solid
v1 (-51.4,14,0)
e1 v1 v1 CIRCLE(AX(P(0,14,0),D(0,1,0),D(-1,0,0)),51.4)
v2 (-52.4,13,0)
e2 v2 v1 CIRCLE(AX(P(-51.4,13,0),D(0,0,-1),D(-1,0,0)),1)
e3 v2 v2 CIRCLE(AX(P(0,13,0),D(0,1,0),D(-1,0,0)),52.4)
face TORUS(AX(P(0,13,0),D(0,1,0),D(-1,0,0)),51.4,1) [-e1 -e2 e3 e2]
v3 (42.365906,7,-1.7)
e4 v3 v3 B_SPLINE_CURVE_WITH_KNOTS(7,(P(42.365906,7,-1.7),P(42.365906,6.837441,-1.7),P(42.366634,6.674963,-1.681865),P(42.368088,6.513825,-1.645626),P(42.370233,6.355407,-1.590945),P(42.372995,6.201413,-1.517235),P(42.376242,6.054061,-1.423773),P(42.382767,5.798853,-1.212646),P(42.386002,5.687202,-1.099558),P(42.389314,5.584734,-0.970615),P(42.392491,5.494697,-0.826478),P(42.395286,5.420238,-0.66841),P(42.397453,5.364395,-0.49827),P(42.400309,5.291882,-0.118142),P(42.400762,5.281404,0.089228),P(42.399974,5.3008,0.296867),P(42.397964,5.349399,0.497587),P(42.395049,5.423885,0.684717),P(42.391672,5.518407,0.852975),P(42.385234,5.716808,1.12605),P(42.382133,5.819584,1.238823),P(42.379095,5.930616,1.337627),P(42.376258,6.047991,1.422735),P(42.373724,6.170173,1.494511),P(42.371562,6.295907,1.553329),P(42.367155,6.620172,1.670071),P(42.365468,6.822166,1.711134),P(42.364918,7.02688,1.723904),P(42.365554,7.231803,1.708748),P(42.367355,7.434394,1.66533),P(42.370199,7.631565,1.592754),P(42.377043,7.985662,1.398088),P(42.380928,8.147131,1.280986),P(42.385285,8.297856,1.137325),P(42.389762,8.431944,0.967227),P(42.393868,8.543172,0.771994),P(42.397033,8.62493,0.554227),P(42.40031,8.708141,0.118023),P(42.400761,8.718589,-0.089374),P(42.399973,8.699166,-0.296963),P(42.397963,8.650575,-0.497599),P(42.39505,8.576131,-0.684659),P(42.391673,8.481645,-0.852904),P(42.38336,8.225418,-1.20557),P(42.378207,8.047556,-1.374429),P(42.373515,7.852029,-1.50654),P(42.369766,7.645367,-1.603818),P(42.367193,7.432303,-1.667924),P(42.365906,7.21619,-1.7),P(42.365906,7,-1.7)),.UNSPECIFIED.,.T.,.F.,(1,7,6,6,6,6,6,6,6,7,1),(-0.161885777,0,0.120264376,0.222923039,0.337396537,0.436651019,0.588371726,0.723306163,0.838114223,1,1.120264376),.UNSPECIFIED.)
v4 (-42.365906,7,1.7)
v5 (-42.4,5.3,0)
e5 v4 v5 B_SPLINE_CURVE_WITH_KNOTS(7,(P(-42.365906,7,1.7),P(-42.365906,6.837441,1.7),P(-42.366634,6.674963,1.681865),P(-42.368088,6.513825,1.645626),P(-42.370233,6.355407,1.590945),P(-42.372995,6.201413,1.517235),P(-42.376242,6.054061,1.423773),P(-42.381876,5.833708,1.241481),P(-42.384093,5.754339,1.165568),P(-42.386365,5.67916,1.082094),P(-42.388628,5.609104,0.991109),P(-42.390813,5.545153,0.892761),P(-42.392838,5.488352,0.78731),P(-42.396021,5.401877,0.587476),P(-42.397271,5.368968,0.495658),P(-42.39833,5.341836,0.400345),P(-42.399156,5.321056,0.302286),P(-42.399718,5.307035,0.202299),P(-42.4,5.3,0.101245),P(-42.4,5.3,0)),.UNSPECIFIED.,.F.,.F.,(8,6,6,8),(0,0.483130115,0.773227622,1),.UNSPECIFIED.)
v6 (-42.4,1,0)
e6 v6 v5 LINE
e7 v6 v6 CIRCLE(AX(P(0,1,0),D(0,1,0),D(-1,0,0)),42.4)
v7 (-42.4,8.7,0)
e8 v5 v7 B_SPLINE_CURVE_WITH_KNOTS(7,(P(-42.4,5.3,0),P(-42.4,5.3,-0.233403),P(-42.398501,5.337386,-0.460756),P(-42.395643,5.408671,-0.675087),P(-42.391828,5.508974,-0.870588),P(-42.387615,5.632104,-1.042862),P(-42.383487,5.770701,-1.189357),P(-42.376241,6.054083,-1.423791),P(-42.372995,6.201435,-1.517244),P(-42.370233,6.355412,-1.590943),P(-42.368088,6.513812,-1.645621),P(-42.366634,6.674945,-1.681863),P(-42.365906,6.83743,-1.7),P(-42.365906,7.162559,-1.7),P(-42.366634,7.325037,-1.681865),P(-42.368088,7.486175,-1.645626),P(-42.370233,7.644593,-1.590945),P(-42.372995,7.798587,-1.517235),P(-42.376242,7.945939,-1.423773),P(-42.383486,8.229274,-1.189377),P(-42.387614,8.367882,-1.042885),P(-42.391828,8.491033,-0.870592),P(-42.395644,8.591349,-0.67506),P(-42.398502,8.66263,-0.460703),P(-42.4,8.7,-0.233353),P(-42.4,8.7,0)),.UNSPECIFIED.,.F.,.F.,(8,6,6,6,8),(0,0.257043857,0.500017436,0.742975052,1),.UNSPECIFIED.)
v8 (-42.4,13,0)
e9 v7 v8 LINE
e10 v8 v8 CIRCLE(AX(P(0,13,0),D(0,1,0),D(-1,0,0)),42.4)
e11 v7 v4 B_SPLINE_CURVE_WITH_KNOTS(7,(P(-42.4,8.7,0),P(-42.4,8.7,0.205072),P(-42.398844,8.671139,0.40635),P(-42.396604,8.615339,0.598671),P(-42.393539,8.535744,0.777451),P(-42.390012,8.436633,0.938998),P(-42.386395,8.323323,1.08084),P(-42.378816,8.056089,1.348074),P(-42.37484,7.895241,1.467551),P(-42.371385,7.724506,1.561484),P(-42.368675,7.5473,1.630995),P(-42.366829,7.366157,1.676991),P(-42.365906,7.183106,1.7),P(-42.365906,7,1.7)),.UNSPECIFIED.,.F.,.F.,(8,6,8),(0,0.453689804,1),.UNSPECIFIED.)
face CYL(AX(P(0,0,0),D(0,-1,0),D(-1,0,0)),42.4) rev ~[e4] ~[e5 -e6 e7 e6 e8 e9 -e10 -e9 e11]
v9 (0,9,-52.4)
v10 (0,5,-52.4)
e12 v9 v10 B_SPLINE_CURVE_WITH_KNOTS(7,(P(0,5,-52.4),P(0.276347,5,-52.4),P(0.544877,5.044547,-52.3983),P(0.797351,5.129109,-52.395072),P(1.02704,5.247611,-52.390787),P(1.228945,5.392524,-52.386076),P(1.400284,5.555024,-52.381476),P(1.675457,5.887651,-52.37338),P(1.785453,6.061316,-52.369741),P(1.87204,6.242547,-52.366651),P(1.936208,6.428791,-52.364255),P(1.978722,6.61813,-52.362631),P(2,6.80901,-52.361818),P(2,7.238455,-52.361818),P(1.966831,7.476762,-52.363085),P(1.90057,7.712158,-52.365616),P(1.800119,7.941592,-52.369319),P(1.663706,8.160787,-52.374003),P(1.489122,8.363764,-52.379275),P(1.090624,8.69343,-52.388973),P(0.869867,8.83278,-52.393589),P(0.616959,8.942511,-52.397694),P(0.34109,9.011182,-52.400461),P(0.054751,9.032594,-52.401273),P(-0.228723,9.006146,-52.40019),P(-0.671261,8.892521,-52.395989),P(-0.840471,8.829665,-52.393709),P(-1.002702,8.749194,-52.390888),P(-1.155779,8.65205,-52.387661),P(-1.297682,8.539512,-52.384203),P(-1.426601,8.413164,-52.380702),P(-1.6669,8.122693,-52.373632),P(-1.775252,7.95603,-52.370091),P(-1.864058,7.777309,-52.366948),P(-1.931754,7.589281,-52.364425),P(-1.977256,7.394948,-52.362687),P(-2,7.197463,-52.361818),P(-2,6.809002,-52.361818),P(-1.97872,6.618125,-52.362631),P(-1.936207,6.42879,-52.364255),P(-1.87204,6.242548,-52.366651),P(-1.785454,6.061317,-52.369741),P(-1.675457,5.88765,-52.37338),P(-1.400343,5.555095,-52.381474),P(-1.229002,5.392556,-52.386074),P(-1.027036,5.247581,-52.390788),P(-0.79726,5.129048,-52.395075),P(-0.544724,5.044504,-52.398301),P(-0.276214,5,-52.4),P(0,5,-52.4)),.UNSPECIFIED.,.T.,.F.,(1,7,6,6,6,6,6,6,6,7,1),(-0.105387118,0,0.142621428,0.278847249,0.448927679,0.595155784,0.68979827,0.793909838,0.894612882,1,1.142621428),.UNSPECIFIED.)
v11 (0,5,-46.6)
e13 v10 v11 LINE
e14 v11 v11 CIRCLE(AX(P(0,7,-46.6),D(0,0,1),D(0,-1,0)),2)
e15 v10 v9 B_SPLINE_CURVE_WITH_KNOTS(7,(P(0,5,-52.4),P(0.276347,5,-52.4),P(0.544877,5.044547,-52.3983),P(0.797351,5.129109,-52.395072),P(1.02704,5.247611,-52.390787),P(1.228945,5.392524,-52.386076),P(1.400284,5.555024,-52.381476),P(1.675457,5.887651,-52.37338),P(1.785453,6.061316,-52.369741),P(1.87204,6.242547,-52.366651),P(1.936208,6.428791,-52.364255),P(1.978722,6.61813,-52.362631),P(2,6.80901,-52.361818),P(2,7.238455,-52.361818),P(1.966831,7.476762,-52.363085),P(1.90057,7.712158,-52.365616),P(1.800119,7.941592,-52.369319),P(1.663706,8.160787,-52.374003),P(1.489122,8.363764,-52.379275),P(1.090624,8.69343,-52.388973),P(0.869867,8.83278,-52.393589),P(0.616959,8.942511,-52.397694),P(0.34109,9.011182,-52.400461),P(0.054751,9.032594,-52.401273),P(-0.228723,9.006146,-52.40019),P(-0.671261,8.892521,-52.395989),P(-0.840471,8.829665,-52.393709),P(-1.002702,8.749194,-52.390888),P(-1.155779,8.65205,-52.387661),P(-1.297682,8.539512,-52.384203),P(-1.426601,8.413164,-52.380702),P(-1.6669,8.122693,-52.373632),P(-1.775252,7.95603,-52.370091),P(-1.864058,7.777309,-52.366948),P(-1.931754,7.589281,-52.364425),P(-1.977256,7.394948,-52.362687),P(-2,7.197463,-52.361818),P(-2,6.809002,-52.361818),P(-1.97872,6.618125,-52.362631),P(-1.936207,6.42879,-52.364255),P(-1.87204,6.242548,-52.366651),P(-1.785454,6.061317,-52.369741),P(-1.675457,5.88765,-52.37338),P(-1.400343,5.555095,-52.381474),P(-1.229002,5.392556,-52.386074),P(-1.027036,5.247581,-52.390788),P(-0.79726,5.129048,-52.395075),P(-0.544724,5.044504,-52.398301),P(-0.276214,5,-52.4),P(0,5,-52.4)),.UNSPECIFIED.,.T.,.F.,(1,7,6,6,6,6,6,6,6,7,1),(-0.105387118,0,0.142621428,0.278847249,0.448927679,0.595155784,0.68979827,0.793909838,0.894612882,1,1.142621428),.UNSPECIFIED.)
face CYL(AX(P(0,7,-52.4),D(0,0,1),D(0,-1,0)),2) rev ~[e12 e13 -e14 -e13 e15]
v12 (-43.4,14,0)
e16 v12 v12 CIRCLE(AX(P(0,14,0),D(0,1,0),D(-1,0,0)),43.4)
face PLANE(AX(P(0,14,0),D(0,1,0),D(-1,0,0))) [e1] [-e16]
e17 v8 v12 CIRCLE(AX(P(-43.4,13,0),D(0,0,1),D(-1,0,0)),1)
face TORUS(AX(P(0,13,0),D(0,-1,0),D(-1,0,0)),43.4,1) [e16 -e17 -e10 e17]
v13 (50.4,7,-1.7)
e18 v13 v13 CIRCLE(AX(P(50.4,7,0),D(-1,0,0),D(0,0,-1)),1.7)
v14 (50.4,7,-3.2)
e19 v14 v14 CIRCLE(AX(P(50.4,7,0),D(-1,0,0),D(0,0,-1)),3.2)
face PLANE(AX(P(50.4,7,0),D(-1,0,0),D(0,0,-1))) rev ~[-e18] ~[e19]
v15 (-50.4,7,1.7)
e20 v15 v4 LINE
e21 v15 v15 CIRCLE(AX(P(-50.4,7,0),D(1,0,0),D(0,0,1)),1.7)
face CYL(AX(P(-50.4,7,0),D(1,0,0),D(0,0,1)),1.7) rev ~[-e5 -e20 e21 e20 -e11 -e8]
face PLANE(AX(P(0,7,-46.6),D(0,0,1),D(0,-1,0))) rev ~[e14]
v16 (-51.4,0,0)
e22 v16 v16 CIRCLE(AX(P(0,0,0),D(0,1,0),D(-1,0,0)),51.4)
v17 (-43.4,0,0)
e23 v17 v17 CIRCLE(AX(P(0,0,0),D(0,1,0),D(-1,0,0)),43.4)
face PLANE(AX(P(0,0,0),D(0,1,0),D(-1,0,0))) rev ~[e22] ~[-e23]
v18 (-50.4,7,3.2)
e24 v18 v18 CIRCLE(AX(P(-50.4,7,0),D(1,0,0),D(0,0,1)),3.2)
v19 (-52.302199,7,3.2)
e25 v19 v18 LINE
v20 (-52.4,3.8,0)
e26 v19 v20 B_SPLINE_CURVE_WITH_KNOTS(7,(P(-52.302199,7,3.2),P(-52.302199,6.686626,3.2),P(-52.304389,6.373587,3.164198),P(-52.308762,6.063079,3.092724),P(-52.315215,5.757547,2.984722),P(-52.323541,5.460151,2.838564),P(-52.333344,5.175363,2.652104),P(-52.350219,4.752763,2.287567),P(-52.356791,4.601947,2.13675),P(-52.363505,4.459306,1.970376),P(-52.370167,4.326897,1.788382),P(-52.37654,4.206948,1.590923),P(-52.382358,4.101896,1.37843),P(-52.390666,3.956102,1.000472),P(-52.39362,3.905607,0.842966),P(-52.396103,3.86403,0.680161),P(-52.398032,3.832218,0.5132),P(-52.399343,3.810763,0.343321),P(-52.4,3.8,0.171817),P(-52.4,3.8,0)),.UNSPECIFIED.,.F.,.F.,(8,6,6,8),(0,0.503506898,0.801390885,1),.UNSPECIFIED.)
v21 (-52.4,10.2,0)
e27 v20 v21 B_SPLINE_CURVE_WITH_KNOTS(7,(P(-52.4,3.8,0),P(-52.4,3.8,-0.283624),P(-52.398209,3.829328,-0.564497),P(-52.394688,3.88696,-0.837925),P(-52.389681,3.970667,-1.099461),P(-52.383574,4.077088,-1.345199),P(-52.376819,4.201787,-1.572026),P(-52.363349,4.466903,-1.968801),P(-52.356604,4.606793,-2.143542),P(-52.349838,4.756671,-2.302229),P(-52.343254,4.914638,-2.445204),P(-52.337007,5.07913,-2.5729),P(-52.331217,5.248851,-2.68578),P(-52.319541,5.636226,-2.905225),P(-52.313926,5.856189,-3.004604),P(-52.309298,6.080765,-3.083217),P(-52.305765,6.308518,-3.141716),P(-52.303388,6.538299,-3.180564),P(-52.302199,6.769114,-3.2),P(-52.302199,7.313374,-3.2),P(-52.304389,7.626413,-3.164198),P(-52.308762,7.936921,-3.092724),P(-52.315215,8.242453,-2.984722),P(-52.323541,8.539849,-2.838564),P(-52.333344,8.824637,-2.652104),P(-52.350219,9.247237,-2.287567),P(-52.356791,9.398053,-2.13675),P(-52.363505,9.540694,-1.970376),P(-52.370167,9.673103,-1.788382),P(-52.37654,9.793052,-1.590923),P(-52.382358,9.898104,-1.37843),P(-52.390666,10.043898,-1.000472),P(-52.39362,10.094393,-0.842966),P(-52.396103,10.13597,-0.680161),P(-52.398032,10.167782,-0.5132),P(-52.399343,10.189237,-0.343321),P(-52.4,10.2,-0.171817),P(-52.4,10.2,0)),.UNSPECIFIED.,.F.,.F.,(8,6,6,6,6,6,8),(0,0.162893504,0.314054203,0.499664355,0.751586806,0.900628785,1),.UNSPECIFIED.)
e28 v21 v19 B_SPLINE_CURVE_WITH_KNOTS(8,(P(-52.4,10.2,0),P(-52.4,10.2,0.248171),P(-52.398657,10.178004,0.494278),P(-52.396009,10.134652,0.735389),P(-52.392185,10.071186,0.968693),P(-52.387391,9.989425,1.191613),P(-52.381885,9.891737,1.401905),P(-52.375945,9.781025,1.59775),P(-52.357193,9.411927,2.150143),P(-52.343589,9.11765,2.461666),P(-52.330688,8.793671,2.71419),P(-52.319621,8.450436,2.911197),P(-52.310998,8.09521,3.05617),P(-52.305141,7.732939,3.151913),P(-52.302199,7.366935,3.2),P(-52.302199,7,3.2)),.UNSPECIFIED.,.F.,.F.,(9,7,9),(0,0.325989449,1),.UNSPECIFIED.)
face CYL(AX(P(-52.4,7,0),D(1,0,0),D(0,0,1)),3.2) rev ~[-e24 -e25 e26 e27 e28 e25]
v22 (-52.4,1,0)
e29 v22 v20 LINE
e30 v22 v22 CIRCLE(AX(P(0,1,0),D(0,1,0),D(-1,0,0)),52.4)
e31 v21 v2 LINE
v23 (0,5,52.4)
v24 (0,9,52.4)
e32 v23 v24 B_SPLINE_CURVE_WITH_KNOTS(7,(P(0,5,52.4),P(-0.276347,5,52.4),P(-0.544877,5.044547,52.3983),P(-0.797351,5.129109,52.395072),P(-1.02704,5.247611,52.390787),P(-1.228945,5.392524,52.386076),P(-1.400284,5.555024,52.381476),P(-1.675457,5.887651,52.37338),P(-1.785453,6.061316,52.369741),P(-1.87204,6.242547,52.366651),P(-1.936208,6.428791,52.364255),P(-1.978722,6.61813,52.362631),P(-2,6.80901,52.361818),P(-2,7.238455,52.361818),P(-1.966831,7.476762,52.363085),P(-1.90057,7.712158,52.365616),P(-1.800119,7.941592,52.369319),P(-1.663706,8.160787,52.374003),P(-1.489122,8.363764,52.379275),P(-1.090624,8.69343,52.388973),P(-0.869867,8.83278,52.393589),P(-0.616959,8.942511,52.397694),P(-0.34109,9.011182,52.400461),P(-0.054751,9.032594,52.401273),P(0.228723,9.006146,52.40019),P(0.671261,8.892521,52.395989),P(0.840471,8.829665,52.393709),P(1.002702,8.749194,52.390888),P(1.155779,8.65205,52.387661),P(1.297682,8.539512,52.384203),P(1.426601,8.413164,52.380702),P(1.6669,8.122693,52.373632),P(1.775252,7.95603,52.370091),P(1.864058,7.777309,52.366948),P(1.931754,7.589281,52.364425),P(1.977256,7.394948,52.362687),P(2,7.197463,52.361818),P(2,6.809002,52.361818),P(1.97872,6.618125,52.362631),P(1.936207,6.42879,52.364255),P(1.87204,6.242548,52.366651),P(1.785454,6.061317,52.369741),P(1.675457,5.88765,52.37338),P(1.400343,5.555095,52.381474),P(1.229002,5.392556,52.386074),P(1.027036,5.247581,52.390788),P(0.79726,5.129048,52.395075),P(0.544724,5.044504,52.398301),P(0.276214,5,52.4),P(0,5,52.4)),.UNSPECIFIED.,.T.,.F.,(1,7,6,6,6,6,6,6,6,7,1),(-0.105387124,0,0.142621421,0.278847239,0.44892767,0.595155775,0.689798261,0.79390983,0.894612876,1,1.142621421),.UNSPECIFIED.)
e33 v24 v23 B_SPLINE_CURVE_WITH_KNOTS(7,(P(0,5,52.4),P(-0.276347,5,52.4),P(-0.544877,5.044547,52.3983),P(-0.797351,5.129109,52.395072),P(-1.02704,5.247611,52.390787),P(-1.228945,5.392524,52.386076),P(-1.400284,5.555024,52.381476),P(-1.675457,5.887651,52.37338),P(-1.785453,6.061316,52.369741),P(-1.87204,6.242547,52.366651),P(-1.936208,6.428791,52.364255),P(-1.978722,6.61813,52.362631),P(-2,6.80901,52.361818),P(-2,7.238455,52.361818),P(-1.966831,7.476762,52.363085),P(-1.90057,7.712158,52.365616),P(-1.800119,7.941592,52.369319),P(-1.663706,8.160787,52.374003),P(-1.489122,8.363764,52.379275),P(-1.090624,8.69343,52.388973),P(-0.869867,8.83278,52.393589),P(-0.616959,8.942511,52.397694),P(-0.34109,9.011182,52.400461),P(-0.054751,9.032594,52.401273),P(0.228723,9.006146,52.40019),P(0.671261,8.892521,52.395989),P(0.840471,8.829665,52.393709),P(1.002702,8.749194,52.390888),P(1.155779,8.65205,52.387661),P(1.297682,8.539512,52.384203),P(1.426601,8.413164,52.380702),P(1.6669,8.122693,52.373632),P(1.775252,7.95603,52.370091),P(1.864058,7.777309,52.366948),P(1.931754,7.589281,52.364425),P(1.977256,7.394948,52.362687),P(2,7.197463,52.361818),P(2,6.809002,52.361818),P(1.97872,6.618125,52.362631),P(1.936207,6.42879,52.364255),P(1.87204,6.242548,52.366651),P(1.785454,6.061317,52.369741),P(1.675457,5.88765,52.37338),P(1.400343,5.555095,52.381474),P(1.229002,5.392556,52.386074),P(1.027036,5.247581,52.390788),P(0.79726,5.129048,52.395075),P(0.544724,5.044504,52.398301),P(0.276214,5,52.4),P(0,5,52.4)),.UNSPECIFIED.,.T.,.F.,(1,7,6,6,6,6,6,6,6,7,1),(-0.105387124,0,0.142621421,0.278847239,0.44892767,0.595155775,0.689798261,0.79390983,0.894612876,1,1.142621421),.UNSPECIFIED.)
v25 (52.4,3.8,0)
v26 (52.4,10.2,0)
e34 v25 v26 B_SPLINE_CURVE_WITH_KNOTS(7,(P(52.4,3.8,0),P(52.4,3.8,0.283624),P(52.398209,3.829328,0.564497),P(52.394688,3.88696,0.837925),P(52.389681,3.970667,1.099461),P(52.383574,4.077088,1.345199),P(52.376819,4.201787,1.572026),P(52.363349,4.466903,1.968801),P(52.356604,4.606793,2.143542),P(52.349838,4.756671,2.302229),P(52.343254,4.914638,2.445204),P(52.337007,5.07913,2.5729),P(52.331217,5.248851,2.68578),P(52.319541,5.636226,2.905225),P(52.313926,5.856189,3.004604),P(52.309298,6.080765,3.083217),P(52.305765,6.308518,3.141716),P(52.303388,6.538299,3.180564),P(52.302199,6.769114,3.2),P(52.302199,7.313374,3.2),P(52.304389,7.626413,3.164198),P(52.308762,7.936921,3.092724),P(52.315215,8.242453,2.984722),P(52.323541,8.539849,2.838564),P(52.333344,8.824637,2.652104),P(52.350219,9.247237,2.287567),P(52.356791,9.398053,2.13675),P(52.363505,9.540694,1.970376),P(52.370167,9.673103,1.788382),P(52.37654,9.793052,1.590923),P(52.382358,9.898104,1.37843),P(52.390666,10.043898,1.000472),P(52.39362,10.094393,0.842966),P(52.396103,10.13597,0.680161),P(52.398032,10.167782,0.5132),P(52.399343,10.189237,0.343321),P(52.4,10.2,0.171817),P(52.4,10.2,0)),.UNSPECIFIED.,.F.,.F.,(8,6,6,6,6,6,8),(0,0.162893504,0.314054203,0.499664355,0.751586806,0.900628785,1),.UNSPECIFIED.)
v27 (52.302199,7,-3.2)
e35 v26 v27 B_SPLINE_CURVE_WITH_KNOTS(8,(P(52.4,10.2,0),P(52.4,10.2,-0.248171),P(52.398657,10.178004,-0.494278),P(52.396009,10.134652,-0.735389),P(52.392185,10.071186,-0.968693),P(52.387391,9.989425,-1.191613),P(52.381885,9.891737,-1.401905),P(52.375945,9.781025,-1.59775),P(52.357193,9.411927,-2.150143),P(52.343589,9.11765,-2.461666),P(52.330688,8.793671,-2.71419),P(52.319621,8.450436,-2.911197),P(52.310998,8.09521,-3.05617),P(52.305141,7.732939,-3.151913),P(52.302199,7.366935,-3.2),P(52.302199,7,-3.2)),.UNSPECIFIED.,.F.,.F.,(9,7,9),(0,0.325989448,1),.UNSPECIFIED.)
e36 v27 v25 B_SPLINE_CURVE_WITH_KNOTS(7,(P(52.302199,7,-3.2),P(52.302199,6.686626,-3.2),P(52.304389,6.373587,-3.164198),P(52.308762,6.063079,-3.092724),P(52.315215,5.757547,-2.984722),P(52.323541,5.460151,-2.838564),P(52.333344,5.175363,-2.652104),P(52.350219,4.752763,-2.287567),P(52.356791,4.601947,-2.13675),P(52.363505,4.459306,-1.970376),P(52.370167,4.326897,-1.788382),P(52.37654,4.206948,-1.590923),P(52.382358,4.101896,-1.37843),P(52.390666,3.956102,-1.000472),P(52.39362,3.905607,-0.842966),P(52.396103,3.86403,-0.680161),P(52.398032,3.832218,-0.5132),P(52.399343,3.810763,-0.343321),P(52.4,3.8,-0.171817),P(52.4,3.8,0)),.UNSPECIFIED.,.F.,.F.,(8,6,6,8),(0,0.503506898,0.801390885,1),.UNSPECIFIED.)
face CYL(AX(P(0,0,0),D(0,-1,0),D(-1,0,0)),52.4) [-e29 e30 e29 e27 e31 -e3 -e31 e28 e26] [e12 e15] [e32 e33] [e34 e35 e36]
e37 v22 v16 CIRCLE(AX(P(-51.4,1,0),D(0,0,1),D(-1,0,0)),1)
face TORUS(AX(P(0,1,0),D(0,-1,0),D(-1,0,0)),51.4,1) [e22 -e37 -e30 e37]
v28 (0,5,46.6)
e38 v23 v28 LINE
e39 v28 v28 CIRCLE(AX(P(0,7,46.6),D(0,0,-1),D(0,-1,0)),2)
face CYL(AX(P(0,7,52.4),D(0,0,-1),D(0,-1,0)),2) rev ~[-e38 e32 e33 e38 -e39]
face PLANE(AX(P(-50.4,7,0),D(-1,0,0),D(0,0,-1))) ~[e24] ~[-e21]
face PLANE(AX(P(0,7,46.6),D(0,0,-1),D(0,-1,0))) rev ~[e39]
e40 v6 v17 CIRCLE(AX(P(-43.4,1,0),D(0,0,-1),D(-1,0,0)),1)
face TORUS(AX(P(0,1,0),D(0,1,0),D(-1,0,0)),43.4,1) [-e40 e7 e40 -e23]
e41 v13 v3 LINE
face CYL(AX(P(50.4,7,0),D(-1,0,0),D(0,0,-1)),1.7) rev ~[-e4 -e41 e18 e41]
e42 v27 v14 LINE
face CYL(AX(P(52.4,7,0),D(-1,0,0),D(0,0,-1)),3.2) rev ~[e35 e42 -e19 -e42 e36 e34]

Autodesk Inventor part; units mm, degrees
sketch "Sketch1" plane through (0, 0, 0) normal (0, 1, 0) x (-1, 0, 0)
  circle A0 centre (0, 0) radius 42.4
  circle A1 centre (0, 0) radius 52.4
  dimension "d0" = 84.8
  dimension "d1" = 10
extrude "Extrusion1" add sketch "Sketch1" along normal blind 14
fillet "Fillet1" radius 1 4 edges at (52.4, 14, 0) (42.4, 14, 0) (52.4, 0, 0) (42.4, 0, 0)
ref_plane "Work Plane1" through (52.4, 0, 0) normal (1, 0, 0) x (0, 1, 0)
sketch "Sketch2" plane through (52.4, 0, 0) normal (1, 0, 0) x (0, 1, 0)
  line L0 (0, 73.36) -> (0, -73.36) projected
  point P0 (0, 0)
  point P1 (7, 0)
  dimension "d5" = 7
hole "Hole1" at (52.4, 7, 0) direction (-1, 0, 0) diameter 3.4 end up to surface counterbore diameter 6.4 counterbore depth 2
pattern_circular "Circular Pattern1" count 2 over 360 about axis through (0, -10, 0) along (0, 1, 0) of "Hole1"
ref_plane "Work Plane7" through (0, 0, 52.4) normal (0, 0, 1) x (1, 0, 0)
sketch "Sketch8" plane through (0, 0, 52.4) normal (0, 0, 1) x (1, 0, 0)
  line L0 (-73.36, 0) -> (73.36, 0) projected
  point P0 (0, 0)
  point P1 (0, 7)
  dimension "d53" = 7
hole "Hole5" at (0, 7, 52.4) direction (0, 0, -1) diameter 4 depth 5.8
pattern_circular "Circular Pattern4" count 2 over 360 about axis through (0, -10, 0) along (0, 1, 0) of "Hole5"
equation "\"d5\" = 0.5 * d2"
equation "\"d53\" = 0.5 * d2"
equation "\"d2\" = 14"
properties part number "o-ring" material "ABS Plastic"
